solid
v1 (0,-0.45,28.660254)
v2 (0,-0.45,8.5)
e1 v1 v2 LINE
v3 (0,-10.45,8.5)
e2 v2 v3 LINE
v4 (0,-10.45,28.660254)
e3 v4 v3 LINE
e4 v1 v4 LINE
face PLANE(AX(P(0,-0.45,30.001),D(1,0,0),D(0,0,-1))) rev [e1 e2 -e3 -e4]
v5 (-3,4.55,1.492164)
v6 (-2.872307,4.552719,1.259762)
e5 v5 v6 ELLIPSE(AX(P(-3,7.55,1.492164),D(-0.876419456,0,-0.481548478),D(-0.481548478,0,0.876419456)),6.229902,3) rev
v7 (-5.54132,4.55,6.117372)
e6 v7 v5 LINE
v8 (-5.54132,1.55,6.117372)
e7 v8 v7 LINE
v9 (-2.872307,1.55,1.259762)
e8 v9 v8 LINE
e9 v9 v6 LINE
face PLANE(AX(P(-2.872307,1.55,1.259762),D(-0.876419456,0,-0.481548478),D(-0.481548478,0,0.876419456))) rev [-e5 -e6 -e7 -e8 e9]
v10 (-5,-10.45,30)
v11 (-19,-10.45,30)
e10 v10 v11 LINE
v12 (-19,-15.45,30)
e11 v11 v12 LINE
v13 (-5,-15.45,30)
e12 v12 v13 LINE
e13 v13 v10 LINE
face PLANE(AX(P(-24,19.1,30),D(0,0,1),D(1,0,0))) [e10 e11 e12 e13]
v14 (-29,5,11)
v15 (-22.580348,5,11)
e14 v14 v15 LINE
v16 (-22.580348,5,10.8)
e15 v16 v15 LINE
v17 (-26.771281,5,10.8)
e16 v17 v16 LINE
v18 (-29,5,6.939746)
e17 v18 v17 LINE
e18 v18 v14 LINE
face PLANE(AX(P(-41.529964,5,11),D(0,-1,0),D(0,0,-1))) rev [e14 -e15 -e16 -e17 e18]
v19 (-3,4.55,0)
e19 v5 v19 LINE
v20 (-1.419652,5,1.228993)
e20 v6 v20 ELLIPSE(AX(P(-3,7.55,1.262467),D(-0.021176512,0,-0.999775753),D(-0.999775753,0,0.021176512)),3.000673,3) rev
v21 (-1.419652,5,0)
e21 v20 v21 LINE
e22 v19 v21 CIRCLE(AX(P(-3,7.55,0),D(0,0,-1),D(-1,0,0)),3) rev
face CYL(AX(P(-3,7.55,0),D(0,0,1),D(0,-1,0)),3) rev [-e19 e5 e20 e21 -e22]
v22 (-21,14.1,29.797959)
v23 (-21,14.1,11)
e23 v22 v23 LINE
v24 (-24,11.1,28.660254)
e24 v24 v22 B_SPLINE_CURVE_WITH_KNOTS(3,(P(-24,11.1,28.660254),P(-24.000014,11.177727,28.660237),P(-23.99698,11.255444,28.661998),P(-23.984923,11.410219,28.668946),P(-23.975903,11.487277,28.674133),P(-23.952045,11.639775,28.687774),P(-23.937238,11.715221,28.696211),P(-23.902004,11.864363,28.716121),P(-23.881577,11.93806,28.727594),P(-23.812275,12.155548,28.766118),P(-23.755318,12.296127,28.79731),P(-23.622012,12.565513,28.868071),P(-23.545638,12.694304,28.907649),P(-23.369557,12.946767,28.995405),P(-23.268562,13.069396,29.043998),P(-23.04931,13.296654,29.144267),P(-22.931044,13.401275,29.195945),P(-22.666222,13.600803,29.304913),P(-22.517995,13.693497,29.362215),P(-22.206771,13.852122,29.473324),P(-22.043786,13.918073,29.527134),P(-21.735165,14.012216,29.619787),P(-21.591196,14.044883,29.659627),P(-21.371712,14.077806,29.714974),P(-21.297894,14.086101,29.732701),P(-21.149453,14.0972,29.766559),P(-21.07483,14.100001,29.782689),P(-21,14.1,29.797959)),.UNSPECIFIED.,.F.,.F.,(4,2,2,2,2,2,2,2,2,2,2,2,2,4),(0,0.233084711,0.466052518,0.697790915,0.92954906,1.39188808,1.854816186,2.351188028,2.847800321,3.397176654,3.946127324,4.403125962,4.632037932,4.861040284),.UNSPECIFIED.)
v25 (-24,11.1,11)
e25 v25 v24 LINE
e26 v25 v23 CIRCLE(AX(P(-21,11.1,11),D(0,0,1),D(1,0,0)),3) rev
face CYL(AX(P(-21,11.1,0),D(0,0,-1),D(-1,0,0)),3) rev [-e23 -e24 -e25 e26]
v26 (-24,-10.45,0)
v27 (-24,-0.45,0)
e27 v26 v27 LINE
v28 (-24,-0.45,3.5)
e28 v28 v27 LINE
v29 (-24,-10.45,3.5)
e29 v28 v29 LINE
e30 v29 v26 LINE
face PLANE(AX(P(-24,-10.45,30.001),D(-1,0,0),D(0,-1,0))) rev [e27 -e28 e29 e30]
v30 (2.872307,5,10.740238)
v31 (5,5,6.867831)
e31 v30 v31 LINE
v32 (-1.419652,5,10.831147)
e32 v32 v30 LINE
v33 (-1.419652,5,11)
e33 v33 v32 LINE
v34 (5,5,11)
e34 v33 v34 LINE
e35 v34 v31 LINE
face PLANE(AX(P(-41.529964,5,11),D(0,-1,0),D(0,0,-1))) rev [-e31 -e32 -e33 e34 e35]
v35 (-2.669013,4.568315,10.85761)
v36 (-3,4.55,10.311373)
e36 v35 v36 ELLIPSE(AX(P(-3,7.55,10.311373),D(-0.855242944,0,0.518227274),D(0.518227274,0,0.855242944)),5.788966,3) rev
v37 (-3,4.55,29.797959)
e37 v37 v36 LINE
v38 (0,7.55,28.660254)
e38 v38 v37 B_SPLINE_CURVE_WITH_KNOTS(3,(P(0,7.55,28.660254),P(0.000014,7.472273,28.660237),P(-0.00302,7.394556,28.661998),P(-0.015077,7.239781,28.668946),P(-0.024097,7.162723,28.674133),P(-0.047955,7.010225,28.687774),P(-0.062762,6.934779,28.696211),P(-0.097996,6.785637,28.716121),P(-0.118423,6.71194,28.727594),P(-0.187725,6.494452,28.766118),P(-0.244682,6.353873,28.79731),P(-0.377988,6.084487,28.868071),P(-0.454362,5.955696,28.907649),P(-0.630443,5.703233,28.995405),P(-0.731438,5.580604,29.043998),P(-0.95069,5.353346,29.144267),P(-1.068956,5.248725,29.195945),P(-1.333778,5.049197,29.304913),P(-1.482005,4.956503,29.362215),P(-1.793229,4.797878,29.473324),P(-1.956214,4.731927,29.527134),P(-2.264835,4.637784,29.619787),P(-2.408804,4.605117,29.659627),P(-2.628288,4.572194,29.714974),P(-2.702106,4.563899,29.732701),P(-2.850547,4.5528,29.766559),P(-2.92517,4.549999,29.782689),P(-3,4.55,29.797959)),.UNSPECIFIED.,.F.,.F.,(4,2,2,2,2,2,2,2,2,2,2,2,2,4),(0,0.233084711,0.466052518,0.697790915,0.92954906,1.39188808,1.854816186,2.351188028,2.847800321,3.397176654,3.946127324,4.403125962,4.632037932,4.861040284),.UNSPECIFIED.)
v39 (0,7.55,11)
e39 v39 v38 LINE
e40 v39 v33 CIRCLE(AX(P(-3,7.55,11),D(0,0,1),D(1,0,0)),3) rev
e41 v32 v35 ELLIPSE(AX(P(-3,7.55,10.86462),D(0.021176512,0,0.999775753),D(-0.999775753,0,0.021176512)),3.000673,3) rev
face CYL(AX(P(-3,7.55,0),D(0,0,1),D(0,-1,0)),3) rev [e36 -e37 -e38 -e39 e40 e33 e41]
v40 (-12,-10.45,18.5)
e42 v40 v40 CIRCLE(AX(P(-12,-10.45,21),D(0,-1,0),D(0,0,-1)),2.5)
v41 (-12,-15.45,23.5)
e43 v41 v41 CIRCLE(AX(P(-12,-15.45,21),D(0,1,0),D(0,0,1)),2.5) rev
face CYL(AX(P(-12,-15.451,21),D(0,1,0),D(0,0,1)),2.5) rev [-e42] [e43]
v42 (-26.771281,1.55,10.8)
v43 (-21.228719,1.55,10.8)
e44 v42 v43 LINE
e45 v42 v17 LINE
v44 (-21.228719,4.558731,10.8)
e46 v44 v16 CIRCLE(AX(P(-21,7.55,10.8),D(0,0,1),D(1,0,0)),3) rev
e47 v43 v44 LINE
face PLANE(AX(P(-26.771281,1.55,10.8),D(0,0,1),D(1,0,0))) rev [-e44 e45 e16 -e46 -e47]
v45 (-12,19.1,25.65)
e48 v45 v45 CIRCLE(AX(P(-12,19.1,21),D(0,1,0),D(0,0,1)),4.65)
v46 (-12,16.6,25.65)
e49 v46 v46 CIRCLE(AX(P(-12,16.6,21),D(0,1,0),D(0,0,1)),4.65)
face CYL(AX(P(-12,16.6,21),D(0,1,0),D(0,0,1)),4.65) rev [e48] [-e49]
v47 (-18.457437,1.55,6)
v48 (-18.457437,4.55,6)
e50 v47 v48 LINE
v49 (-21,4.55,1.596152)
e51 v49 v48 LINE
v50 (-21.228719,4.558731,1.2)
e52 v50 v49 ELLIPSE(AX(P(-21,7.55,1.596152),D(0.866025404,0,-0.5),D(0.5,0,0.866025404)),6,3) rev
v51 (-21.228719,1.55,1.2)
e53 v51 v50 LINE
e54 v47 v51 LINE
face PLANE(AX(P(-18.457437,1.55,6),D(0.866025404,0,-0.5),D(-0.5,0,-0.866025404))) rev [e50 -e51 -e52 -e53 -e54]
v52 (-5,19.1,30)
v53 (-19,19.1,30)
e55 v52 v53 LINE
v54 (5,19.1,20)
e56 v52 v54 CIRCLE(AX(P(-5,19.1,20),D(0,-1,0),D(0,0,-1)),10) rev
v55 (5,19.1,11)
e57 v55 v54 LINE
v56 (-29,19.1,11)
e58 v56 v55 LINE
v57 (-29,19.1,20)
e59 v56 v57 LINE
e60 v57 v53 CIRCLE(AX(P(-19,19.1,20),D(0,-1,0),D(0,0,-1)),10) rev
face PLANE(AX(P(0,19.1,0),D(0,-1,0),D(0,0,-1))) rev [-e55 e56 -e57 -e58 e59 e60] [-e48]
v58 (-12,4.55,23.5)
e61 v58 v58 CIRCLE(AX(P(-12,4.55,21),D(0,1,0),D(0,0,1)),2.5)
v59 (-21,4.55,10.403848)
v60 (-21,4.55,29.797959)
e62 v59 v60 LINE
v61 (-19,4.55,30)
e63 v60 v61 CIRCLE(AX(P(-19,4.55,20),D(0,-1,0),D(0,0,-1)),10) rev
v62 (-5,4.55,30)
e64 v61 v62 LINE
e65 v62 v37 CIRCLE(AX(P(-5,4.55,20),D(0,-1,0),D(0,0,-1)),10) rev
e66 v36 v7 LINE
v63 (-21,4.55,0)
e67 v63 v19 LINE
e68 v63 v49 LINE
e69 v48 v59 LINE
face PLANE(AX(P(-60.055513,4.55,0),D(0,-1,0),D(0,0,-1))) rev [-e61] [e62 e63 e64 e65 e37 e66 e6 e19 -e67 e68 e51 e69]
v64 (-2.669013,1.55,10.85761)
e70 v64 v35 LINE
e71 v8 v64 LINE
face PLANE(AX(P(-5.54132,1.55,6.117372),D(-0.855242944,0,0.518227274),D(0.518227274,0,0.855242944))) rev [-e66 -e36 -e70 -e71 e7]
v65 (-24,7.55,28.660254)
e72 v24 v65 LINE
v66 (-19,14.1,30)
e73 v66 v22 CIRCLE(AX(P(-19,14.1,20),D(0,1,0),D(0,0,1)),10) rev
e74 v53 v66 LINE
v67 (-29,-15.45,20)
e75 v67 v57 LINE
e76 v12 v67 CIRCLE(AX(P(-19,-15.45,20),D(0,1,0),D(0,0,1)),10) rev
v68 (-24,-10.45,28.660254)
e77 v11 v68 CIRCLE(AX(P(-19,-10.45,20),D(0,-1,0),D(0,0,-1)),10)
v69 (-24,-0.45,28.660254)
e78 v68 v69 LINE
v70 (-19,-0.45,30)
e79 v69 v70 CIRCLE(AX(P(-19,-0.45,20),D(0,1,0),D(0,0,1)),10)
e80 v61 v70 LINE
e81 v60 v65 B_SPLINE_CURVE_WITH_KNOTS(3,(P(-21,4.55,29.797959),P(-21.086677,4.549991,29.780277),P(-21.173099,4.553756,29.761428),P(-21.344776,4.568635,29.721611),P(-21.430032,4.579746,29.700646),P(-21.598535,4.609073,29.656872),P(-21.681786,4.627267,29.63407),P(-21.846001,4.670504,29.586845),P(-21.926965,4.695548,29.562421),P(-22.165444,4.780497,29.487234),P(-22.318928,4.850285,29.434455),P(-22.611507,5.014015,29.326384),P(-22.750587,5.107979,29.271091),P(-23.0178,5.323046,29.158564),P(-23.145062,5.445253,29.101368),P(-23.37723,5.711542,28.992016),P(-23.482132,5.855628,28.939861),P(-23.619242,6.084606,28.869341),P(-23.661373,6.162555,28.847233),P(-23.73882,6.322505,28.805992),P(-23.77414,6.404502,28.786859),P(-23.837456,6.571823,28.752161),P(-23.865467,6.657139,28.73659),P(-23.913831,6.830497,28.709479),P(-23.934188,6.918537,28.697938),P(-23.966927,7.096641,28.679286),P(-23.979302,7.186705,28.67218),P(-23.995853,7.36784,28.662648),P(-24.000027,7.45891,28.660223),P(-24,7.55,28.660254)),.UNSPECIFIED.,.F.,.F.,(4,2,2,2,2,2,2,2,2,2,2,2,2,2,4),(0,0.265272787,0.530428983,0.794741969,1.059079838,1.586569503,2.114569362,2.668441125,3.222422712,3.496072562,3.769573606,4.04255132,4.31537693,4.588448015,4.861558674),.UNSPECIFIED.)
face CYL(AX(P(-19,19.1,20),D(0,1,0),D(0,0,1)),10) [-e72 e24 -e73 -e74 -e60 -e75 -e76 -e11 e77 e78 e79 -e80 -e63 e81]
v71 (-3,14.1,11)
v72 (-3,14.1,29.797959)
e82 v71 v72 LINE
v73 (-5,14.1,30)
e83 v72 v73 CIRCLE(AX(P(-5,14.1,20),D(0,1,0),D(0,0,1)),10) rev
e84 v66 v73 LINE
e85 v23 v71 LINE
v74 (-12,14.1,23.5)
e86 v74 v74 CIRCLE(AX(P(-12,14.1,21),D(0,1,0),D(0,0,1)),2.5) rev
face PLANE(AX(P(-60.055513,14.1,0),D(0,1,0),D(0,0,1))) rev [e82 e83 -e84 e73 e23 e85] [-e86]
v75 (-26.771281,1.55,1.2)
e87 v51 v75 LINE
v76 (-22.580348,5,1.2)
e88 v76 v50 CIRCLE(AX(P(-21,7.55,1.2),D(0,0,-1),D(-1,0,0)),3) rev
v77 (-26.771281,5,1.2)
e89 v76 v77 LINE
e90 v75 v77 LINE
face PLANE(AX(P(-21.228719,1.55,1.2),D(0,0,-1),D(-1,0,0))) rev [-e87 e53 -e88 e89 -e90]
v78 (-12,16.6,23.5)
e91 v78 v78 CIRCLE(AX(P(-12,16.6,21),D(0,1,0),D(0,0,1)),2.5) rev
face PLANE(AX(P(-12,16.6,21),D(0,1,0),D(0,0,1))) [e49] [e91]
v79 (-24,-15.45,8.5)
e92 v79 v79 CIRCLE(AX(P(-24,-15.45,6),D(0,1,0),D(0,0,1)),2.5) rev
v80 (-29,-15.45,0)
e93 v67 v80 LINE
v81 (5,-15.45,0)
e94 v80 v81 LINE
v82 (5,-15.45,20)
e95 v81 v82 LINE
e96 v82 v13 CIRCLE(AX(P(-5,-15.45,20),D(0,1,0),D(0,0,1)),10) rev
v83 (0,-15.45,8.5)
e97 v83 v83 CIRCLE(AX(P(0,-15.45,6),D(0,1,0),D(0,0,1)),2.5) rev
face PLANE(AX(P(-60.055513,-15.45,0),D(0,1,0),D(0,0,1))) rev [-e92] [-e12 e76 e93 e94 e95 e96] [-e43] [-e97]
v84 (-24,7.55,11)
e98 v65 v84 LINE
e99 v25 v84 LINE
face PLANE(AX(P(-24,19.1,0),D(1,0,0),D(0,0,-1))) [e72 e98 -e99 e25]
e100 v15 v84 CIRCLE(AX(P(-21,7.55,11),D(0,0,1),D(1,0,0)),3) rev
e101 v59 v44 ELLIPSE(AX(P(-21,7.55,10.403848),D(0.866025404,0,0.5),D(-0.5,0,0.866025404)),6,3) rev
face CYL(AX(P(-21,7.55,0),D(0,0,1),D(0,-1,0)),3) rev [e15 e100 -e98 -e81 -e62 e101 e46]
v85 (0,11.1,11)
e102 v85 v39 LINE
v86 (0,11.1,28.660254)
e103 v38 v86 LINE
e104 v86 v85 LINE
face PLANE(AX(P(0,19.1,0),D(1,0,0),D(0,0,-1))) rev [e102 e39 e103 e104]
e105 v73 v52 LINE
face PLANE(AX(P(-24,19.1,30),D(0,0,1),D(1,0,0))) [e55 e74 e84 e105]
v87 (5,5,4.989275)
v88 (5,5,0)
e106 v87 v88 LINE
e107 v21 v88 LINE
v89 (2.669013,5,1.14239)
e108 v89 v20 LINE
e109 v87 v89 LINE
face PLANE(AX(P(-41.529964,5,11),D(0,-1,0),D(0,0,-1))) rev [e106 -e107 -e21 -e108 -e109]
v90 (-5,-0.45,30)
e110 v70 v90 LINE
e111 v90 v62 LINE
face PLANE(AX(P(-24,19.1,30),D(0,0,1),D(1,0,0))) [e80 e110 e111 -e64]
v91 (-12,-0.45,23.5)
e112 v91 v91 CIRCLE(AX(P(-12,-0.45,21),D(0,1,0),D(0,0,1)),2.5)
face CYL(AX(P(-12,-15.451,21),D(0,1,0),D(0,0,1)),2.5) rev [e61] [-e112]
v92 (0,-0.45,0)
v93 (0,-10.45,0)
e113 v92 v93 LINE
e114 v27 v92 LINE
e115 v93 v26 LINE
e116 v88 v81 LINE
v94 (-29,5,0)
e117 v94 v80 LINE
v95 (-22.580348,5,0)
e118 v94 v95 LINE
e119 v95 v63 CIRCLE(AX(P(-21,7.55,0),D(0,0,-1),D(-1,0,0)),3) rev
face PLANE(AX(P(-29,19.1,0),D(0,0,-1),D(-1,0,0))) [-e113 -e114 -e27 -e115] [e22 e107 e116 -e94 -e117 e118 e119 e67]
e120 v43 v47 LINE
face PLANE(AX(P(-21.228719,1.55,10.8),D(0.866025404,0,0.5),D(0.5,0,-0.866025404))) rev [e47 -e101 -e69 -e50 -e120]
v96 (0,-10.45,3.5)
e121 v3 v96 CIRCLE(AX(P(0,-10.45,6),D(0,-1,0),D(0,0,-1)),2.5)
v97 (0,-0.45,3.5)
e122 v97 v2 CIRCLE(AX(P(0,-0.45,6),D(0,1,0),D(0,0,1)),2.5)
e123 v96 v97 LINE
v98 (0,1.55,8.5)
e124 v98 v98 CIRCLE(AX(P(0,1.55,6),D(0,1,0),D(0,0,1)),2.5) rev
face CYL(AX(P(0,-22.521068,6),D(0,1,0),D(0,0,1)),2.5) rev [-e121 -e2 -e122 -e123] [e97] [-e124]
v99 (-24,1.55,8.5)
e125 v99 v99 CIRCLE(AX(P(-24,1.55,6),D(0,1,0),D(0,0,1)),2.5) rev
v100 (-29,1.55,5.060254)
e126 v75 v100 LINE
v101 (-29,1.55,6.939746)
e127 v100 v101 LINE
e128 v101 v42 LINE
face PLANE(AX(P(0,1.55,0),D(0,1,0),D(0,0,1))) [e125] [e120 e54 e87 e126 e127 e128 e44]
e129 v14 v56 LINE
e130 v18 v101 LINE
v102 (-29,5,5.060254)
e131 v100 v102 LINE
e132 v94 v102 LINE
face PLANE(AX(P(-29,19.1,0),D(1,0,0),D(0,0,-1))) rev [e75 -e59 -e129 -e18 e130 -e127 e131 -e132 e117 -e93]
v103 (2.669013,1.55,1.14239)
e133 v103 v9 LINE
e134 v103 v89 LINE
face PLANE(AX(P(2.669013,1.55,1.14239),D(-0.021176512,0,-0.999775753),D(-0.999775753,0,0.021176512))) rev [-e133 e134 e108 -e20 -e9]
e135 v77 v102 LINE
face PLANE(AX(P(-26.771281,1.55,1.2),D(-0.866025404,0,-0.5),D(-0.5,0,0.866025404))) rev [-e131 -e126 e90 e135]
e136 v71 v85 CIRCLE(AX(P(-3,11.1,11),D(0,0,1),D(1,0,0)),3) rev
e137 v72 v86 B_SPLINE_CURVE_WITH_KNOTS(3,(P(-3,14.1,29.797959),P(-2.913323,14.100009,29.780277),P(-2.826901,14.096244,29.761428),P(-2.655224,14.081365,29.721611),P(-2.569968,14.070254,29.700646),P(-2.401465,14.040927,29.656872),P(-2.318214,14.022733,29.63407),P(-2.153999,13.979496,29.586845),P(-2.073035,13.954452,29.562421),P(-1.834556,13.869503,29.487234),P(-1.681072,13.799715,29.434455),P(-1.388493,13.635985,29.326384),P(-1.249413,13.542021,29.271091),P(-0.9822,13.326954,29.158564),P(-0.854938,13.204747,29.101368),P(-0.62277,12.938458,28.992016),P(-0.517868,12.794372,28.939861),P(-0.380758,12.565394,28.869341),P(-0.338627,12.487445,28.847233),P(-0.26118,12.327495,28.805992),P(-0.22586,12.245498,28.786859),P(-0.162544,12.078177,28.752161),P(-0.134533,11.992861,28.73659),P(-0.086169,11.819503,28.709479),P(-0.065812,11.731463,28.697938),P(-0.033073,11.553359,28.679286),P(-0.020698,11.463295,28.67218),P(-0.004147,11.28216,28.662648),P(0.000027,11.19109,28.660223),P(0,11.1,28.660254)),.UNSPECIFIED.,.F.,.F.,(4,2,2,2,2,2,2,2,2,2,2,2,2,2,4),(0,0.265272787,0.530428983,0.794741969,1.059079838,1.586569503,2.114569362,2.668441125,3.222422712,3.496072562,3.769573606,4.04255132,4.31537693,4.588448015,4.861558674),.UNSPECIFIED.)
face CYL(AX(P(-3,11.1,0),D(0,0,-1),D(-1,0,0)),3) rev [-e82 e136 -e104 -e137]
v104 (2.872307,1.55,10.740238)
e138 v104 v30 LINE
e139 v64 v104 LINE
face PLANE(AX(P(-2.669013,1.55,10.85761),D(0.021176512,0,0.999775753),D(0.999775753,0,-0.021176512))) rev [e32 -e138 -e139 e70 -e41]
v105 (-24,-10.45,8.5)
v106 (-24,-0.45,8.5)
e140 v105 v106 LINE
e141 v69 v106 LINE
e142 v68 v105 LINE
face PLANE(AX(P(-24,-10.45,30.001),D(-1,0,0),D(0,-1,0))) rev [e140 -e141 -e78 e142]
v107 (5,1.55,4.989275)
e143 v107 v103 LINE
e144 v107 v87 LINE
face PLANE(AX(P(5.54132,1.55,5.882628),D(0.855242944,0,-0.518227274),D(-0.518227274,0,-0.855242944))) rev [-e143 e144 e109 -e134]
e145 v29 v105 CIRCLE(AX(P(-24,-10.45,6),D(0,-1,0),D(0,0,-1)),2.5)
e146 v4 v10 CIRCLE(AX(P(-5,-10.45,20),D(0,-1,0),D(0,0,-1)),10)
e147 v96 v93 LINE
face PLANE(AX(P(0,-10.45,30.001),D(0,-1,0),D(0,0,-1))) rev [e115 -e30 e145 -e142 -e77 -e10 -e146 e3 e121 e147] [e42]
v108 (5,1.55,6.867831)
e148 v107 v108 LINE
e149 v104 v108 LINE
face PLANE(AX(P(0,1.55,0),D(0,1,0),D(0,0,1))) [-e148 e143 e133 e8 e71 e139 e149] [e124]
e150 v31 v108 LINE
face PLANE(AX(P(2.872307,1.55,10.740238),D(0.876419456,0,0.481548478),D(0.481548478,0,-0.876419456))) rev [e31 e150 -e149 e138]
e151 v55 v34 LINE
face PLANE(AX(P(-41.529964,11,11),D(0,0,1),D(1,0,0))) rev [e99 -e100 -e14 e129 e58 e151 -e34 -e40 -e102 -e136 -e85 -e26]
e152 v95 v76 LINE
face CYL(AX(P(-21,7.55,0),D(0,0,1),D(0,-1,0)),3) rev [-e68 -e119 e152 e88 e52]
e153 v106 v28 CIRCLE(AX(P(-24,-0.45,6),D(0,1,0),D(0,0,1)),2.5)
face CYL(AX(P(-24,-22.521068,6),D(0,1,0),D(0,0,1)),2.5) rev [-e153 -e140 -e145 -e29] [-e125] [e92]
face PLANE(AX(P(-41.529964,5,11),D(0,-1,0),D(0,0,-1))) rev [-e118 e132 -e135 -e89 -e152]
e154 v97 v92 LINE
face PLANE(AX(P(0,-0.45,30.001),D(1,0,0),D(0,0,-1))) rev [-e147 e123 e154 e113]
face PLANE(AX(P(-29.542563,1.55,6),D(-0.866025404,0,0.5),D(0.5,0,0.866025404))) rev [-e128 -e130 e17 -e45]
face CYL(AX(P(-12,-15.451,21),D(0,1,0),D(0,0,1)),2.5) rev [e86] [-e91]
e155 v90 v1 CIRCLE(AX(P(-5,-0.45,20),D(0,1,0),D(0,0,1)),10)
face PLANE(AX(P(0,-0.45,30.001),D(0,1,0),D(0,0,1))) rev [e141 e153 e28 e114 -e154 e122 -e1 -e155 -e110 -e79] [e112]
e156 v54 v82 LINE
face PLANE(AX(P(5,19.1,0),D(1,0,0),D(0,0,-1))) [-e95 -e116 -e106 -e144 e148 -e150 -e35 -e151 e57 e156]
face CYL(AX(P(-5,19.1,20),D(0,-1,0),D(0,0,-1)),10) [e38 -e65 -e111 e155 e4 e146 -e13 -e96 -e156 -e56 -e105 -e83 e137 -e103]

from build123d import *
from build123d.topology import SkipClean

# Parameters (mm, degrees)
CROQUIS1_W                = 5
CROQUIS1_H                = 30
SALIENTE_EXTRUIR1_DEPTH   = 19.1
SALIENTE_EXTRUIR1_2_DEPTH = 19.1
CROQUIS2_W                = 30
CROQUIS2_H                = 5
CROQUIS2_H_2              = 20
SALIENTE_EXTRUIR2_DEPTH   = 24
CORTAR_EXTRUIR1_REACH     = 56.173
CROQUIS3_R                = 2.5
CROQUIS4_R                = 4.65
CORTAR_EXTRUIR2_DEPTH     = 2.5
REDONDEO1_R               = 10
CORTAR_EXTRUIR8_REACH     = 48.271
CROQUIS12_R               = 2.5
REDONDEO2_DEPTH           = 29.797959071
REDONDEO2_START           = 4.55
REDONDEO2_2_DEPTH         = 6.55
REDONDEO2_START_2         = 7.549995607
REDONDEO2_3_DEPTH         = 6.550004393
CORTAR_EXTRUIR10_DEPTH    = 3
CROQUIS15_W               = 11
CROQUIS15_H               = 6
CORTAR_EXTRUIR11_DEPTH    = 34
CORTAR_EXTRUIR14_REACH    = 48.271
CROQUIS17_R               = 2.5
CROQUIS18_W               = 11
CROQUIS18_H               = 8.1
CORTAR_EXTRUIR15_DEPTH    = 34
SALIENTE_EXTRUIR3_REACH   = 56.173
CORTAR_EXTRUIR16_REACH    = 47.889
CROQUIS20_W               = 24
CROQUIS20_H               = 10


with BuildPart() as part:
    # Croquis1 → Saliente-Extruir1 (new body)
    with BuildSketch(Plane(origin=(0, 0, 0), x_dir=(1, 0, 0), z_dir=(0, 1, 0))):
        with Locations((2.5, -15)):
            Rectangle(CROQUIS1_W, CROQUIS1_H)
    extrude(amount=SALIENTE_EXTRUIR1_DEPTH)



with BuildPart() as body_2:
    # Croquis1 → Saliente-Extruir1 2 (new body)
    with BuildSketch(Plane(origin=(0, 0, 0), x_dir=(1, 0, 0), z_dir=(0, 1, 0))):
        with Locations((-26.5, -15)):
            Rectangle(CROQUIS1_W, CROQUIS1_H)
    extrude(amount=SALIENTE_EXTRUIR1_2_DEPTH)


with BuildPart() as part_1:
    add(part.part)

    add(body_2.part)  # Saliente-Extruir2 merges body 2
    # Croquis2 → Saliente-Extruir2 (add)
    with BuildSketch(Plane.ZY):
        with Locations((15, 16.6)):
            Rectangle(CROQUIS2_W, CROQUIS2_H)
        with Locations((15, -5.45)):
            Rectangle(CROQUIS2_W, CROQUIS2_H_2)
    extrude(amount=SALIENTE_EXTRUIR2_DEPTH)

    # Croquis3 → Cortar-Extruir1 (cut, up to next)
    with BuildSketch(Plane(origin=(0, 19.1, 0), x_dir=(1, 0, 0), z_dir=(0, 1, 0)), mode=Mode.PRIVATE) as cortar_extruir1_sk1:
        with Locations(Location((-12, -21, 0), (0, 0, 270))):
            Circle(CROQUIS3_R)
    cortar_extruir1_tool1 = extrude(cortar_extruir1_sk1.sketch, amount=-CORTAR_EXTRUIR1_REACH, mode=Mode.PRIVATE) & part_1.part
    add(cortar_extruir1_tool1.solids().sort_by_distance((-12, 19.1, 21))[0], mode=Mode.SUBTRACT)

    # Croquis4 → Cortar-Extruir2 (cut)
    with BuildSketch(Plane(origin=(0, 19.1, 0), x_dir=(1, 0, 0), z_dir=(0, 1, 0))):
        with Locations(Location((-12, -21, 0), (0, 0, 270))):
            Circle(CROQUIS4_R)
    extrude(amount=-CORTAR_EXTRUIR2_DEPTH, mode=Mode.SUBTRACT)

    # Redondeo1
    # the kernel refuses this fillet: 10 mm, written as the material it takes off along each edge
    with BuildSketch(Plane(origin=(-29, -25, 30), x_dir=(1, 0, 0), z_dir=(0, 1, 0)), Plane(origin=(5, -25, 30), x_dir=(0, 0, -1), z_dir=(0, 1, 0))) as redondeo1_piece_1:
        with BuildLine():
            CenterArc((REDONDEO1_R, REDONDEO1_R), REDONDEO1_R, 180, 90)
            Line((0, REDONDEO1_R), (0, 0))
            Line((0, 0), (REDONDEO1_R, 0))
        make_face()
    extrude(amount=69.1, mode=Mode.SUBTRACT)

    # Cortar-Extruir8: up to this face of the body (flat: up to its plane)
    cortar_extruir8_end = Plane(part_1.part.faces().sort_by_distance((-12, -15.45, 14.911465184))[0])
    # Croquis12 → Cortar-Extruir8 (cut, up to the picked face)
    with BuildSketch(Plane(origin=(0, 4.55, 0), x_dir=(1, 0, 0), z_dir=(0, 1, 0)), mode=Mode.PRIVATE) as cortar_extruir8_sk1:
        with Locations(Location((-24, -6, 0), (0, 0, 270))):
            Circle(CROQUIS12_R)
    cortar_extruir8_tool1 = split(extrude(cortar_extruir8_sk1.sketch, amount=-CORTAR_EXTRUIR8_REACH, mode=Mode.PRIVATE), bisect_by=cortar_extruir8_end, keep=Keep.BOTH, mode=Mode.PRIVATE)
    # Croquis12 → Cortar-Extruir8 (cut, up to the picked face)
    with BuildSketch(Plane(origin=(0, 4.55, 0), x_dir=(1, 0, 0), z_dir=(0, 1, 0)), mode=Mode.PRIVATE) as cortar_extruir8_sk2:
        with Locations(Location((0, -6, 0), (0, 0, 270))):
            Circle(CROQUIS12_R)
    cortar_extruir8_tool2 = split(extrude(cortar_extruir8_sk2.sketch, amount=-CORTAR_EXTRUIR8_REACH, mode=Mode.PRIVATE), bisect_by=cortar_extruir8_end, keep=Keep.BOTH, mode=Mode.PRIVATE)
    add(cortar_extruir8_tool1.solids().sort_by(Axis((-24, 4.55, 6), (0, -1, 0)))[0], mode=Mode.SUBTRACT)
    add(cortar_extruir8_tool2.solids().sort_by(Axis((0, 4.55, 6), (0, -1, 0)))[0], mode=Mode.SUBTRACT)

    # Redondeo2: read off the stored shape, not the designer's step
    # Redondeo2 outline → Redondeo2 (add)
    with BuildSketch(Plane.XY):
        with BuildLine():
            Line((-24, 14.1), (-24, 11.1))
            ThreePointArc((-24, 11.1), (-23.121320344, 13.221320344), (-21, 14.1))
            Line((-21, 14.1), (-24, 14.1))
        make_face()
        with BuildLine():
            ThreePointArc((-21, 4.55), (-23.121320344, 5.428679656), (-24, 7.55))
            Line((-24, 7.55), (-24, 4.55))
            Line((-24, 4.55), (-21, 4.55))
        make_face()
        with BuildLine():
            Line((0, 14.1), (-3, 14.1))
            ThreePointArc((-3, 14.1), (-0.878679656, 13.221320344), (0, 11.1))
            Line((0, 11.1), (0, 14.1))
        make_face()
        with BuildLine():
            ThreePointArc((0, 7.55), (-0.878679656, 5.428679656), (-3, 4.55))
            Line((-3, 4.55), (0, 4.55))
            Line((0, 4.55), (0, 7.55))
        make_face()
    extrude(amount=REDONDEO2_DEPTH)

    # Redondeo2 2 outline → Redondeo2 2 (cut)
    with BuildSketch(Plane(origin=(0, 0, 0), x_dir=(1, 0, 0), z_dir=(0, 1, 0)).offset(REDONDEO2_START)):
        with BuildLine():
            ThreePointArc((-24, -8.5), (-21.5, -6), (-24, -3.5))
            Line((-24, -3.5), (-24, -8.5))
        make_face()
        with BuildLine():
            ThreePointArc((-20.99999998, -29.797958975), (-22.545926263, -29.350208925), (-24, -28.660254038))
            Line((-24, -28.660254038), (-24, -29.797959071))
            Line((-24, -29.797959071), (-20.99999998, -29.797958975))
        make_face()
        with BuildLine():
            Line((0, -29.797959071), (0, -28.660254038))
            ThreePointArc((0, -28.660254038), (-1.454073737, -29.350208925), (-3.00000002, -29.797958975))
            Line((-3.00000002, -29.797958975), (0, -29.797959071))
        make_face()
        with BuildLine():
            Line((0, -8.5), (0, -3.5))
            ThreePointArc((0, -3.5), (-2.5, -6), (0, -8.5))
        make_face()
    extrude(amount=REDONDEO2_2_DEPTH, mode=Mode.SUBTRACT)

    # Redondeo2 3 outline → Redondeo2 3 (cut)
    with BuildSketch(Plane(origin=(0, 0, 0), x_dir=(1, 0, 0), z_dir=(0, 1, 0)).offset(REDONDEO2_START_2)):
        with BuildLine():
            ThreePointArc((-20.99999998, -29.797958975), (-22.545926263, -29.350208925), (-24, -28.660254038))
            Line((-24, -28.660254038), (-24, -29.797959071))
            Line((-24, -29.797959071), (-20.99999998, -29.797958975))
        make_face()
        with BuildLine():
            Line((0, -29.797959071), (0, -28.660254038))
            ThreePointArc((0, -28.660254038), (-1.454073737, -29.350208925), (-3.00000002, -29.797958975))
            Line((-3.00000002, -29.797958975), (0, -29.797959071))
        make_face()
    extrude(amount=REDONDEO2_3_DEPTH, mode=Mode.SUBTRACT)

    # Croquis14 → Cortar-Extruir10 (cut, symmetric)
    with SkipClean():  # the faces are left unmerged after this step: merging them gives an invalid solid
        with BuildSketch(Plane(origin=(0, 4.55, 0), x_dir=(1, 0, 0), z_dir=(0, 1, 0))):
            Polygon((-5.541319679, -6.117372146), (-2.669012579, -10.857609685), (2.872307099, -10.740237539), (5.541319679, -5.882627854), (2.669012579, -1.142390315), (-2.872307099, -1.259762461), align=None)
            Polygon((-18.457437416, -6), (-21.228718708, -1.2), (-26.771281292, -1.2), (-29.542562584, -6), (-26.771281292, -10.8), (-21.228718708, -10.8), align=None)
        extrude(amount=CORTAR_EXTRUIR10_DEPTH, both=True, mode=Mode.SUBTRACT)

    # Croquis15 → Cortar-Extruir11 (cut)
    with BuildSketch(Plane(origin=(5, 0, 0), x_dir=(0, 0, -1), z_dir=(1, 0, 0))):
        with Locations((-5.5, 8)):
            Rectangle(CROQUIS15_W, CROQUIS15_H)
    extrude(amount=-CORTAR_EXTRUIR11_DEPTH, mode=Mode.SUBTRACT)

    # Croquis17 → Cortar-Extruir14 (cut, up to next)
    with BuildSketch(Plane(origin=(0, 4.55, 0), x_dir=(1, 0, 0), z_dir=(0, 1, 0)), mode=Mode.PRIVATE) as cortar_extruir14_sk1:
        with Locations(Location((-12, -21, 0), (0, 0, 270))):
            Circle(CROQUIS17_R)
    cortar_extruir14_tool1 = extrude(cortar_extruir14_sk1.sketch, amount=-CORTAR_EXTRUIR14_REACH, mode=Mode.PRIVATE) & part_1.part
    add(cortar_extruir14_tool1.solids().sort_by_distance((-12, 4.55, 21))[0], mode=Mode.SUBTRACT)

    # Croquis18 → Cortar-Extruir15 (cut)
    with BuildSketch(Plane(origin=(5, 0, 0), x_dir=(0, 0, -1), z_dir=(1, 0, 0))):
        with Locations((-5.5, 15.05)):
            Rectangle(CROQUIS18_W, CROQUIS18_H)
    extrude(amount=-CORTAR_EXTRUIR15_DEPTH, mode=Mode.SUBTRACT)

    # Croquis19 → Saliente-Extruir3 (add, up to next)
    with BuildSketch(Plane(origin=(0, -15.45, 0), x_dir=(-1, 0, 0), z_dir=(0, -1, 0)), mode=Mode.PRIVATE) as saliente_extruir3_sk1:
        with BuildLine():
            Line((0, -28.660254038), (0, -8.5))
            ThreePointArc((0, -8.5), (-2.5, -6), (0, -3.5))
            Line((0, -3.5), (0, 0))
            Line((0, 0), (-5, 0))
            Line((-5, 0), (-5, -20))
            ThreePointArc((-5, -20), (-3.660254038, -25), (0, -28.660254038))
        make_face()
    saliente_extruir3_tool1 = extrude(saliente_extruir3_sk1.sketch, amount=-SALIENTE_EXTRUIR3_REACH, mode=Mode.PRIVATE) - part_1.part
    # Croquis19 → Saliente-Extruir3 (add, up to next)
    with BuildSketch(Plane(origin=(0, -15.45, 0), x_dir=(-1, 0, 0), z_dir=(0, -1, 0)), mode=Mode.PRIVATE) as saliente_extruir3_sk2:
        with BuildLine():
            Line((24, -8.5), (24, -28.660254038))
            ThreePointArc((24, -28.660254038), (27.660254038, -25), (29, -20))
            Line((29, -20), (29, 0))
            Line((29, 0), (24, 0))
            Line((24, 0), (24, -3.5))
            ThreePointArc((24, -3.5), (26.5, -6), (24, -8.5))
        make_face()
    saliente_extruir3_tool2 = extrude(saliente_extruir3_sk2.sketch, amount=-SALIENTE_EXTRUIR3_REACH, mode=Mode.PRIVATE) - part_1.part
    add(saliente_extruir3_tool1.solids().sort_by_distance((2.502598, -15.45, 13.726714))[0])
    add(saliente_extruir3_tool2.solids().sort_by_distance((-26.502598, -15.45, 13.726714))[0])

    # Croquis20 → Cortar-Extruir16 (cut, up to next)
    with BuildSketch(Plane(origin=(0, 0, 0), x_dir=(-1, 0, 0), z_dir=(0, 0, -1)), mode=Mode.PRIVATE) as cortar_extruir16_sk1:
        with Locations((12, -5.45)):
            Rectangle(CROQUIS20_W, CROQUIS20_H)
    cortar_extruir16_tool1 = extrude(cortar_extruir16_sk1.sketch, amount=-CORTAR_EXTRUIR16_REACH, mode=Mode.PRIVATE) & part_1.part
    add(cortar_extruir16_tool1.solids().sort_by_distance((-12, -5.45, 0))[0], mode=Mode.SUBTRACT)


solid = part_1.part
